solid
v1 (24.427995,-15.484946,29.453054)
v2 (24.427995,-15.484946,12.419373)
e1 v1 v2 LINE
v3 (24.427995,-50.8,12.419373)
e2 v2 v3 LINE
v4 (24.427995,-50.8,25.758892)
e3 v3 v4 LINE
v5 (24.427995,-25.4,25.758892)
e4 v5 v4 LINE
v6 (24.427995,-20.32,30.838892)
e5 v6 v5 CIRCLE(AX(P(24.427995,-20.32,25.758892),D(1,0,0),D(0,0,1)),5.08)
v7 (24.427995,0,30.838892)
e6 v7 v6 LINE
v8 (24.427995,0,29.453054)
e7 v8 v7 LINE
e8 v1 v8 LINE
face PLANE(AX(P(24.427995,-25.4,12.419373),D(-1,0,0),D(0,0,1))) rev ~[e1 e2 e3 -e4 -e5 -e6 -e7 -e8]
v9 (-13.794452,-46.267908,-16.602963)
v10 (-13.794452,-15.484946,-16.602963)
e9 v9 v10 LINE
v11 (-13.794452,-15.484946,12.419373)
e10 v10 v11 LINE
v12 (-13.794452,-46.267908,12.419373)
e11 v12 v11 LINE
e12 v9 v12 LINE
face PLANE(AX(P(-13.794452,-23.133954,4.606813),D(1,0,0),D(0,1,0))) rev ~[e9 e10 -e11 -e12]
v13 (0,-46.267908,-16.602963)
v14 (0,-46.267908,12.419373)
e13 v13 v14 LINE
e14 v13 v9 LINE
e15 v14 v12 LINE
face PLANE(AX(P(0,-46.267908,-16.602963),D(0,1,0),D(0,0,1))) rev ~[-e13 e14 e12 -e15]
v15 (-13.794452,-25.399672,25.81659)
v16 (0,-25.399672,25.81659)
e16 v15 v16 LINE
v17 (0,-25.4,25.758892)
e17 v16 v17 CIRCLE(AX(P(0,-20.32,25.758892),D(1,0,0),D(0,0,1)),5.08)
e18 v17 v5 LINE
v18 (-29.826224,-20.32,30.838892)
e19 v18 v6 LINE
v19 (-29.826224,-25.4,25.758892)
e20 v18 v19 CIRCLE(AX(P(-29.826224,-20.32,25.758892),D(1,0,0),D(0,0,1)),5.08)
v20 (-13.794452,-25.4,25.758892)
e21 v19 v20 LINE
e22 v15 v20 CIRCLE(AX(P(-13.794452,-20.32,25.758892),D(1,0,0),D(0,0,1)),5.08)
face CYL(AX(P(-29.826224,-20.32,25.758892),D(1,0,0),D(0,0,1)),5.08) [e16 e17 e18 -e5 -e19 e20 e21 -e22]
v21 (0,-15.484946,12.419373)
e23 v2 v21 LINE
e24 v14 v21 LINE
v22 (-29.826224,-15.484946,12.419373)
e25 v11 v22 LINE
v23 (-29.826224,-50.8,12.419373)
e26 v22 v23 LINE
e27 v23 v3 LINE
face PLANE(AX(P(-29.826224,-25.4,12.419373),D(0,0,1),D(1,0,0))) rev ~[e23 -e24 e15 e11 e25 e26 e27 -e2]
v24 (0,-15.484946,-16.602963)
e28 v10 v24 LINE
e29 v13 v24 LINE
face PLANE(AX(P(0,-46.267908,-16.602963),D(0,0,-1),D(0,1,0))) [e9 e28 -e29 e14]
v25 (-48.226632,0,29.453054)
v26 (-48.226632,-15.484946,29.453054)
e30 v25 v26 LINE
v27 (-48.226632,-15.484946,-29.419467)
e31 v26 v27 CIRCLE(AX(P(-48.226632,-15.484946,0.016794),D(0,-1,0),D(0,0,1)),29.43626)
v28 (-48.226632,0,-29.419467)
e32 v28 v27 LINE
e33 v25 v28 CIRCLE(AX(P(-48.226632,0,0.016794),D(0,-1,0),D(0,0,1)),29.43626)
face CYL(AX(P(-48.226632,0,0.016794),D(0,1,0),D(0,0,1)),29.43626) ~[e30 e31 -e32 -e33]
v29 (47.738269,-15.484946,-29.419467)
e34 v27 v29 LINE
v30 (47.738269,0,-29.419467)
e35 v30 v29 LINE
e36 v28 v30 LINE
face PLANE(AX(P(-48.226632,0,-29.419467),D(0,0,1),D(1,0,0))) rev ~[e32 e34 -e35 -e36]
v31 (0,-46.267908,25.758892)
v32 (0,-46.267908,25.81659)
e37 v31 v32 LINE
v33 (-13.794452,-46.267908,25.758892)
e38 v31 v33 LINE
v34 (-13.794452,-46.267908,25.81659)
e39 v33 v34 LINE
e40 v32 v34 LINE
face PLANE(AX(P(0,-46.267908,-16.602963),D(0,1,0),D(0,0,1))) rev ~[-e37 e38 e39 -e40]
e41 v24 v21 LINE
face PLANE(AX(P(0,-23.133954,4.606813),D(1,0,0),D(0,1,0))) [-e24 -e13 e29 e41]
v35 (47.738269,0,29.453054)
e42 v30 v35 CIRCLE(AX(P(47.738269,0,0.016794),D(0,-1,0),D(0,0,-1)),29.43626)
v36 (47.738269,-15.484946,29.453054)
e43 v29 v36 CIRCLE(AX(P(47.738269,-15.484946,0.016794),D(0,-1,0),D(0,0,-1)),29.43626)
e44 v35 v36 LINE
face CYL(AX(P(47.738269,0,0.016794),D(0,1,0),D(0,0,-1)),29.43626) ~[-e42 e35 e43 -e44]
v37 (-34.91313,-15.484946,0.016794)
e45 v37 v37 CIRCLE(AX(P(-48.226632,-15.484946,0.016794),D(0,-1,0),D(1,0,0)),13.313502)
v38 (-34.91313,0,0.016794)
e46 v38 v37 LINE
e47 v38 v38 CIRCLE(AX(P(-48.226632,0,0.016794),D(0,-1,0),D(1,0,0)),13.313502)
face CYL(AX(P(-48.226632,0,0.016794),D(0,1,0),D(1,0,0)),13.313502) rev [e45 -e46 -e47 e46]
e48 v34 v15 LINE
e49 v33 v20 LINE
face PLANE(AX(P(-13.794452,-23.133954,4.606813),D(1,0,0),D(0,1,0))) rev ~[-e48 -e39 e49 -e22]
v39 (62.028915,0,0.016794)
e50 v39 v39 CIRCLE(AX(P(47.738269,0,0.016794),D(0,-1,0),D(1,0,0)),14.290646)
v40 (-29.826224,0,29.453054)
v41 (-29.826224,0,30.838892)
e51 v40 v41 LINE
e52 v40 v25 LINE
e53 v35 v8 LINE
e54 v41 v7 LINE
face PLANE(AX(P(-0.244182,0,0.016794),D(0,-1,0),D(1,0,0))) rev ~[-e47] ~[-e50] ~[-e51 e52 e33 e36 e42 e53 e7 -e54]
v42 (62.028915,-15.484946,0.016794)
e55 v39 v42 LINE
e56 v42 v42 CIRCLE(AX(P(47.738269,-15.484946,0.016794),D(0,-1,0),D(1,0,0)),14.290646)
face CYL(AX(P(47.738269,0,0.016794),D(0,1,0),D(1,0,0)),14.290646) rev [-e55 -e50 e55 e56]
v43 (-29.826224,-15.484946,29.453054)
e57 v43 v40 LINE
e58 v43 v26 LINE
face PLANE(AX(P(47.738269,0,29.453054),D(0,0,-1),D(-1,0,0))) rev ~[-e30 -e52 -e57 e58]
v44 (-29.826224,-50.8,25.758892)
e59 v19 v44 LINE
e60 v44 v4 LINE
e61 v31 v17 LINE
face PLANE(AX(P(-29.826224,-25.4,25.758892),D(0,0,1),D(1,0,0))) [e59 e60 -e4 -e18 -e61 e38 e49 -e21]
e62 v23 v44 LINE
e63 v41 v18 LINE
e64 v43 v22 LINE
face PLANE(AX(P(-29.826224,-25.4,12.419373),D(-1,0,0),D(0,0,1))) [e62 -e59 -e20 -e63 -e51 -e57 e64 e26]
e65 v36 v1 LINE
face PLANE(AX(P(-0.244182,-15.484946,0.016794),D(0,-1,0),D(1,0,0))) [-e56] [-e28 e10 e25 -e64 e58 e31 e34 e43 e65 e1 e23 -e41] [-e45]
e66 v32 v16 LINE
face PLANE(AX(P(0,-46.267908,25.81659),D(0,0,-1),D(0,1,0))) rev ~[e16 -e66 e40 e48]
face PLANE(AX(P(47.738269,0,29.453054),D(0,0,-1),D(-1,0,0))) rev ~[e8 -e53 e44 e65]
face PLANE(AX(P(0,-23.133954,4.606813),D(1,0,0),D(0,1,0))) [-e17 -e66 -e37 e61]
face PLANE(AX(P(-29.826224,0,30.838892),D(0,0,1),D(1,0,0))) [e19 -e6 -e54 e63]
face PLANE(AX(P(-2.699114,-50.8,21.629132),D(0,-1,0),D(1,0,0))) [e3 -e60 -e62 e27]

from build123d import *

# Parameters (mm, degrees)
F0_R     = 13.3135020733
F0_R_2   = 14.2906457186
F1_DEPTH = 15.4849458486
F2_W     = 54.254218936
F2_H     = 18.4195190668
F3_DEPTH = 25.4
F4_R     = 5.08
F5_DEPTH = 25.4
F6_W     = 46.2679080665
F6_H     = 42.419552803
F7_DEPTH = 13.794451952


# Not quite as in the source:
# - the program builds the solid bodies; features that only make, move or delete a surface that nothing else refers to are left out


with BuildPart() as f1:
    # F0 (on Front) → F1 (new body)
    with BuildSketch(Plane.XZ):
        with BuildLine():
            Line((47.7382689714, 29.4530540705), (-48.2266321778, 29.4530540705))
            ThreePointArc((-48.2266321778, 29.4530540705), (-77.6628926396, 0.0167936087), (-48.2266321778, -29.4194668531))
            Line((-48.2266321778, -29.4194668531), (47.7382689714, -29.4194668531))
            ThreePointArc((47.7382689714, -29.4194668531), (77.1745294333, 0.0167936087), (47.7382689714, 29.4530540705))
        make_face()
        with Locations((-48.2266321778, 0.0167936087)):
            Circle(F0_R, mode=Mode.SUBTRACT)
        with Locations((47.7382689714, 0.0167936087)):
            Circle(F0_R_2, mode=Mode.SUBTRACT)
    extrude(amount=F1_DEPTH)

    # F2 (on Front) → F3 (join)
    with BuildSketch(Plane.XZ):
        with Locations((-2.6991143823, 21.6291323304)):
            Rectangle(F2_W, F2_H)
    extrude(amount=F3_DEPTH)

    # F4
    f4_edges = [f1.edges().sort_by_distance(p)[0] for p in [
        (-2.699114, -25.4, 30.838892),
    ]]
    fillet(f4_edges, radius=F4_R)

    # F5 (add): a face of the model
    f5_faces = [f1.faces().sort_by_distance(p)[0] for p in [
        (-2.6991143823, -25.4, 19.0891323304),
    ]]
    extrude(f5_faces, amount=F5_DEPTH)

    # F6 (on Right) → F7 (join)
    with BuildSketch(Plane.YZ):
        with Locations((-23.1339540333, 4.6068131924)):
            Rectangle(F6_W, F6_H)
    extrude(amount=-F7_DEPTH)


solid = f1.part
